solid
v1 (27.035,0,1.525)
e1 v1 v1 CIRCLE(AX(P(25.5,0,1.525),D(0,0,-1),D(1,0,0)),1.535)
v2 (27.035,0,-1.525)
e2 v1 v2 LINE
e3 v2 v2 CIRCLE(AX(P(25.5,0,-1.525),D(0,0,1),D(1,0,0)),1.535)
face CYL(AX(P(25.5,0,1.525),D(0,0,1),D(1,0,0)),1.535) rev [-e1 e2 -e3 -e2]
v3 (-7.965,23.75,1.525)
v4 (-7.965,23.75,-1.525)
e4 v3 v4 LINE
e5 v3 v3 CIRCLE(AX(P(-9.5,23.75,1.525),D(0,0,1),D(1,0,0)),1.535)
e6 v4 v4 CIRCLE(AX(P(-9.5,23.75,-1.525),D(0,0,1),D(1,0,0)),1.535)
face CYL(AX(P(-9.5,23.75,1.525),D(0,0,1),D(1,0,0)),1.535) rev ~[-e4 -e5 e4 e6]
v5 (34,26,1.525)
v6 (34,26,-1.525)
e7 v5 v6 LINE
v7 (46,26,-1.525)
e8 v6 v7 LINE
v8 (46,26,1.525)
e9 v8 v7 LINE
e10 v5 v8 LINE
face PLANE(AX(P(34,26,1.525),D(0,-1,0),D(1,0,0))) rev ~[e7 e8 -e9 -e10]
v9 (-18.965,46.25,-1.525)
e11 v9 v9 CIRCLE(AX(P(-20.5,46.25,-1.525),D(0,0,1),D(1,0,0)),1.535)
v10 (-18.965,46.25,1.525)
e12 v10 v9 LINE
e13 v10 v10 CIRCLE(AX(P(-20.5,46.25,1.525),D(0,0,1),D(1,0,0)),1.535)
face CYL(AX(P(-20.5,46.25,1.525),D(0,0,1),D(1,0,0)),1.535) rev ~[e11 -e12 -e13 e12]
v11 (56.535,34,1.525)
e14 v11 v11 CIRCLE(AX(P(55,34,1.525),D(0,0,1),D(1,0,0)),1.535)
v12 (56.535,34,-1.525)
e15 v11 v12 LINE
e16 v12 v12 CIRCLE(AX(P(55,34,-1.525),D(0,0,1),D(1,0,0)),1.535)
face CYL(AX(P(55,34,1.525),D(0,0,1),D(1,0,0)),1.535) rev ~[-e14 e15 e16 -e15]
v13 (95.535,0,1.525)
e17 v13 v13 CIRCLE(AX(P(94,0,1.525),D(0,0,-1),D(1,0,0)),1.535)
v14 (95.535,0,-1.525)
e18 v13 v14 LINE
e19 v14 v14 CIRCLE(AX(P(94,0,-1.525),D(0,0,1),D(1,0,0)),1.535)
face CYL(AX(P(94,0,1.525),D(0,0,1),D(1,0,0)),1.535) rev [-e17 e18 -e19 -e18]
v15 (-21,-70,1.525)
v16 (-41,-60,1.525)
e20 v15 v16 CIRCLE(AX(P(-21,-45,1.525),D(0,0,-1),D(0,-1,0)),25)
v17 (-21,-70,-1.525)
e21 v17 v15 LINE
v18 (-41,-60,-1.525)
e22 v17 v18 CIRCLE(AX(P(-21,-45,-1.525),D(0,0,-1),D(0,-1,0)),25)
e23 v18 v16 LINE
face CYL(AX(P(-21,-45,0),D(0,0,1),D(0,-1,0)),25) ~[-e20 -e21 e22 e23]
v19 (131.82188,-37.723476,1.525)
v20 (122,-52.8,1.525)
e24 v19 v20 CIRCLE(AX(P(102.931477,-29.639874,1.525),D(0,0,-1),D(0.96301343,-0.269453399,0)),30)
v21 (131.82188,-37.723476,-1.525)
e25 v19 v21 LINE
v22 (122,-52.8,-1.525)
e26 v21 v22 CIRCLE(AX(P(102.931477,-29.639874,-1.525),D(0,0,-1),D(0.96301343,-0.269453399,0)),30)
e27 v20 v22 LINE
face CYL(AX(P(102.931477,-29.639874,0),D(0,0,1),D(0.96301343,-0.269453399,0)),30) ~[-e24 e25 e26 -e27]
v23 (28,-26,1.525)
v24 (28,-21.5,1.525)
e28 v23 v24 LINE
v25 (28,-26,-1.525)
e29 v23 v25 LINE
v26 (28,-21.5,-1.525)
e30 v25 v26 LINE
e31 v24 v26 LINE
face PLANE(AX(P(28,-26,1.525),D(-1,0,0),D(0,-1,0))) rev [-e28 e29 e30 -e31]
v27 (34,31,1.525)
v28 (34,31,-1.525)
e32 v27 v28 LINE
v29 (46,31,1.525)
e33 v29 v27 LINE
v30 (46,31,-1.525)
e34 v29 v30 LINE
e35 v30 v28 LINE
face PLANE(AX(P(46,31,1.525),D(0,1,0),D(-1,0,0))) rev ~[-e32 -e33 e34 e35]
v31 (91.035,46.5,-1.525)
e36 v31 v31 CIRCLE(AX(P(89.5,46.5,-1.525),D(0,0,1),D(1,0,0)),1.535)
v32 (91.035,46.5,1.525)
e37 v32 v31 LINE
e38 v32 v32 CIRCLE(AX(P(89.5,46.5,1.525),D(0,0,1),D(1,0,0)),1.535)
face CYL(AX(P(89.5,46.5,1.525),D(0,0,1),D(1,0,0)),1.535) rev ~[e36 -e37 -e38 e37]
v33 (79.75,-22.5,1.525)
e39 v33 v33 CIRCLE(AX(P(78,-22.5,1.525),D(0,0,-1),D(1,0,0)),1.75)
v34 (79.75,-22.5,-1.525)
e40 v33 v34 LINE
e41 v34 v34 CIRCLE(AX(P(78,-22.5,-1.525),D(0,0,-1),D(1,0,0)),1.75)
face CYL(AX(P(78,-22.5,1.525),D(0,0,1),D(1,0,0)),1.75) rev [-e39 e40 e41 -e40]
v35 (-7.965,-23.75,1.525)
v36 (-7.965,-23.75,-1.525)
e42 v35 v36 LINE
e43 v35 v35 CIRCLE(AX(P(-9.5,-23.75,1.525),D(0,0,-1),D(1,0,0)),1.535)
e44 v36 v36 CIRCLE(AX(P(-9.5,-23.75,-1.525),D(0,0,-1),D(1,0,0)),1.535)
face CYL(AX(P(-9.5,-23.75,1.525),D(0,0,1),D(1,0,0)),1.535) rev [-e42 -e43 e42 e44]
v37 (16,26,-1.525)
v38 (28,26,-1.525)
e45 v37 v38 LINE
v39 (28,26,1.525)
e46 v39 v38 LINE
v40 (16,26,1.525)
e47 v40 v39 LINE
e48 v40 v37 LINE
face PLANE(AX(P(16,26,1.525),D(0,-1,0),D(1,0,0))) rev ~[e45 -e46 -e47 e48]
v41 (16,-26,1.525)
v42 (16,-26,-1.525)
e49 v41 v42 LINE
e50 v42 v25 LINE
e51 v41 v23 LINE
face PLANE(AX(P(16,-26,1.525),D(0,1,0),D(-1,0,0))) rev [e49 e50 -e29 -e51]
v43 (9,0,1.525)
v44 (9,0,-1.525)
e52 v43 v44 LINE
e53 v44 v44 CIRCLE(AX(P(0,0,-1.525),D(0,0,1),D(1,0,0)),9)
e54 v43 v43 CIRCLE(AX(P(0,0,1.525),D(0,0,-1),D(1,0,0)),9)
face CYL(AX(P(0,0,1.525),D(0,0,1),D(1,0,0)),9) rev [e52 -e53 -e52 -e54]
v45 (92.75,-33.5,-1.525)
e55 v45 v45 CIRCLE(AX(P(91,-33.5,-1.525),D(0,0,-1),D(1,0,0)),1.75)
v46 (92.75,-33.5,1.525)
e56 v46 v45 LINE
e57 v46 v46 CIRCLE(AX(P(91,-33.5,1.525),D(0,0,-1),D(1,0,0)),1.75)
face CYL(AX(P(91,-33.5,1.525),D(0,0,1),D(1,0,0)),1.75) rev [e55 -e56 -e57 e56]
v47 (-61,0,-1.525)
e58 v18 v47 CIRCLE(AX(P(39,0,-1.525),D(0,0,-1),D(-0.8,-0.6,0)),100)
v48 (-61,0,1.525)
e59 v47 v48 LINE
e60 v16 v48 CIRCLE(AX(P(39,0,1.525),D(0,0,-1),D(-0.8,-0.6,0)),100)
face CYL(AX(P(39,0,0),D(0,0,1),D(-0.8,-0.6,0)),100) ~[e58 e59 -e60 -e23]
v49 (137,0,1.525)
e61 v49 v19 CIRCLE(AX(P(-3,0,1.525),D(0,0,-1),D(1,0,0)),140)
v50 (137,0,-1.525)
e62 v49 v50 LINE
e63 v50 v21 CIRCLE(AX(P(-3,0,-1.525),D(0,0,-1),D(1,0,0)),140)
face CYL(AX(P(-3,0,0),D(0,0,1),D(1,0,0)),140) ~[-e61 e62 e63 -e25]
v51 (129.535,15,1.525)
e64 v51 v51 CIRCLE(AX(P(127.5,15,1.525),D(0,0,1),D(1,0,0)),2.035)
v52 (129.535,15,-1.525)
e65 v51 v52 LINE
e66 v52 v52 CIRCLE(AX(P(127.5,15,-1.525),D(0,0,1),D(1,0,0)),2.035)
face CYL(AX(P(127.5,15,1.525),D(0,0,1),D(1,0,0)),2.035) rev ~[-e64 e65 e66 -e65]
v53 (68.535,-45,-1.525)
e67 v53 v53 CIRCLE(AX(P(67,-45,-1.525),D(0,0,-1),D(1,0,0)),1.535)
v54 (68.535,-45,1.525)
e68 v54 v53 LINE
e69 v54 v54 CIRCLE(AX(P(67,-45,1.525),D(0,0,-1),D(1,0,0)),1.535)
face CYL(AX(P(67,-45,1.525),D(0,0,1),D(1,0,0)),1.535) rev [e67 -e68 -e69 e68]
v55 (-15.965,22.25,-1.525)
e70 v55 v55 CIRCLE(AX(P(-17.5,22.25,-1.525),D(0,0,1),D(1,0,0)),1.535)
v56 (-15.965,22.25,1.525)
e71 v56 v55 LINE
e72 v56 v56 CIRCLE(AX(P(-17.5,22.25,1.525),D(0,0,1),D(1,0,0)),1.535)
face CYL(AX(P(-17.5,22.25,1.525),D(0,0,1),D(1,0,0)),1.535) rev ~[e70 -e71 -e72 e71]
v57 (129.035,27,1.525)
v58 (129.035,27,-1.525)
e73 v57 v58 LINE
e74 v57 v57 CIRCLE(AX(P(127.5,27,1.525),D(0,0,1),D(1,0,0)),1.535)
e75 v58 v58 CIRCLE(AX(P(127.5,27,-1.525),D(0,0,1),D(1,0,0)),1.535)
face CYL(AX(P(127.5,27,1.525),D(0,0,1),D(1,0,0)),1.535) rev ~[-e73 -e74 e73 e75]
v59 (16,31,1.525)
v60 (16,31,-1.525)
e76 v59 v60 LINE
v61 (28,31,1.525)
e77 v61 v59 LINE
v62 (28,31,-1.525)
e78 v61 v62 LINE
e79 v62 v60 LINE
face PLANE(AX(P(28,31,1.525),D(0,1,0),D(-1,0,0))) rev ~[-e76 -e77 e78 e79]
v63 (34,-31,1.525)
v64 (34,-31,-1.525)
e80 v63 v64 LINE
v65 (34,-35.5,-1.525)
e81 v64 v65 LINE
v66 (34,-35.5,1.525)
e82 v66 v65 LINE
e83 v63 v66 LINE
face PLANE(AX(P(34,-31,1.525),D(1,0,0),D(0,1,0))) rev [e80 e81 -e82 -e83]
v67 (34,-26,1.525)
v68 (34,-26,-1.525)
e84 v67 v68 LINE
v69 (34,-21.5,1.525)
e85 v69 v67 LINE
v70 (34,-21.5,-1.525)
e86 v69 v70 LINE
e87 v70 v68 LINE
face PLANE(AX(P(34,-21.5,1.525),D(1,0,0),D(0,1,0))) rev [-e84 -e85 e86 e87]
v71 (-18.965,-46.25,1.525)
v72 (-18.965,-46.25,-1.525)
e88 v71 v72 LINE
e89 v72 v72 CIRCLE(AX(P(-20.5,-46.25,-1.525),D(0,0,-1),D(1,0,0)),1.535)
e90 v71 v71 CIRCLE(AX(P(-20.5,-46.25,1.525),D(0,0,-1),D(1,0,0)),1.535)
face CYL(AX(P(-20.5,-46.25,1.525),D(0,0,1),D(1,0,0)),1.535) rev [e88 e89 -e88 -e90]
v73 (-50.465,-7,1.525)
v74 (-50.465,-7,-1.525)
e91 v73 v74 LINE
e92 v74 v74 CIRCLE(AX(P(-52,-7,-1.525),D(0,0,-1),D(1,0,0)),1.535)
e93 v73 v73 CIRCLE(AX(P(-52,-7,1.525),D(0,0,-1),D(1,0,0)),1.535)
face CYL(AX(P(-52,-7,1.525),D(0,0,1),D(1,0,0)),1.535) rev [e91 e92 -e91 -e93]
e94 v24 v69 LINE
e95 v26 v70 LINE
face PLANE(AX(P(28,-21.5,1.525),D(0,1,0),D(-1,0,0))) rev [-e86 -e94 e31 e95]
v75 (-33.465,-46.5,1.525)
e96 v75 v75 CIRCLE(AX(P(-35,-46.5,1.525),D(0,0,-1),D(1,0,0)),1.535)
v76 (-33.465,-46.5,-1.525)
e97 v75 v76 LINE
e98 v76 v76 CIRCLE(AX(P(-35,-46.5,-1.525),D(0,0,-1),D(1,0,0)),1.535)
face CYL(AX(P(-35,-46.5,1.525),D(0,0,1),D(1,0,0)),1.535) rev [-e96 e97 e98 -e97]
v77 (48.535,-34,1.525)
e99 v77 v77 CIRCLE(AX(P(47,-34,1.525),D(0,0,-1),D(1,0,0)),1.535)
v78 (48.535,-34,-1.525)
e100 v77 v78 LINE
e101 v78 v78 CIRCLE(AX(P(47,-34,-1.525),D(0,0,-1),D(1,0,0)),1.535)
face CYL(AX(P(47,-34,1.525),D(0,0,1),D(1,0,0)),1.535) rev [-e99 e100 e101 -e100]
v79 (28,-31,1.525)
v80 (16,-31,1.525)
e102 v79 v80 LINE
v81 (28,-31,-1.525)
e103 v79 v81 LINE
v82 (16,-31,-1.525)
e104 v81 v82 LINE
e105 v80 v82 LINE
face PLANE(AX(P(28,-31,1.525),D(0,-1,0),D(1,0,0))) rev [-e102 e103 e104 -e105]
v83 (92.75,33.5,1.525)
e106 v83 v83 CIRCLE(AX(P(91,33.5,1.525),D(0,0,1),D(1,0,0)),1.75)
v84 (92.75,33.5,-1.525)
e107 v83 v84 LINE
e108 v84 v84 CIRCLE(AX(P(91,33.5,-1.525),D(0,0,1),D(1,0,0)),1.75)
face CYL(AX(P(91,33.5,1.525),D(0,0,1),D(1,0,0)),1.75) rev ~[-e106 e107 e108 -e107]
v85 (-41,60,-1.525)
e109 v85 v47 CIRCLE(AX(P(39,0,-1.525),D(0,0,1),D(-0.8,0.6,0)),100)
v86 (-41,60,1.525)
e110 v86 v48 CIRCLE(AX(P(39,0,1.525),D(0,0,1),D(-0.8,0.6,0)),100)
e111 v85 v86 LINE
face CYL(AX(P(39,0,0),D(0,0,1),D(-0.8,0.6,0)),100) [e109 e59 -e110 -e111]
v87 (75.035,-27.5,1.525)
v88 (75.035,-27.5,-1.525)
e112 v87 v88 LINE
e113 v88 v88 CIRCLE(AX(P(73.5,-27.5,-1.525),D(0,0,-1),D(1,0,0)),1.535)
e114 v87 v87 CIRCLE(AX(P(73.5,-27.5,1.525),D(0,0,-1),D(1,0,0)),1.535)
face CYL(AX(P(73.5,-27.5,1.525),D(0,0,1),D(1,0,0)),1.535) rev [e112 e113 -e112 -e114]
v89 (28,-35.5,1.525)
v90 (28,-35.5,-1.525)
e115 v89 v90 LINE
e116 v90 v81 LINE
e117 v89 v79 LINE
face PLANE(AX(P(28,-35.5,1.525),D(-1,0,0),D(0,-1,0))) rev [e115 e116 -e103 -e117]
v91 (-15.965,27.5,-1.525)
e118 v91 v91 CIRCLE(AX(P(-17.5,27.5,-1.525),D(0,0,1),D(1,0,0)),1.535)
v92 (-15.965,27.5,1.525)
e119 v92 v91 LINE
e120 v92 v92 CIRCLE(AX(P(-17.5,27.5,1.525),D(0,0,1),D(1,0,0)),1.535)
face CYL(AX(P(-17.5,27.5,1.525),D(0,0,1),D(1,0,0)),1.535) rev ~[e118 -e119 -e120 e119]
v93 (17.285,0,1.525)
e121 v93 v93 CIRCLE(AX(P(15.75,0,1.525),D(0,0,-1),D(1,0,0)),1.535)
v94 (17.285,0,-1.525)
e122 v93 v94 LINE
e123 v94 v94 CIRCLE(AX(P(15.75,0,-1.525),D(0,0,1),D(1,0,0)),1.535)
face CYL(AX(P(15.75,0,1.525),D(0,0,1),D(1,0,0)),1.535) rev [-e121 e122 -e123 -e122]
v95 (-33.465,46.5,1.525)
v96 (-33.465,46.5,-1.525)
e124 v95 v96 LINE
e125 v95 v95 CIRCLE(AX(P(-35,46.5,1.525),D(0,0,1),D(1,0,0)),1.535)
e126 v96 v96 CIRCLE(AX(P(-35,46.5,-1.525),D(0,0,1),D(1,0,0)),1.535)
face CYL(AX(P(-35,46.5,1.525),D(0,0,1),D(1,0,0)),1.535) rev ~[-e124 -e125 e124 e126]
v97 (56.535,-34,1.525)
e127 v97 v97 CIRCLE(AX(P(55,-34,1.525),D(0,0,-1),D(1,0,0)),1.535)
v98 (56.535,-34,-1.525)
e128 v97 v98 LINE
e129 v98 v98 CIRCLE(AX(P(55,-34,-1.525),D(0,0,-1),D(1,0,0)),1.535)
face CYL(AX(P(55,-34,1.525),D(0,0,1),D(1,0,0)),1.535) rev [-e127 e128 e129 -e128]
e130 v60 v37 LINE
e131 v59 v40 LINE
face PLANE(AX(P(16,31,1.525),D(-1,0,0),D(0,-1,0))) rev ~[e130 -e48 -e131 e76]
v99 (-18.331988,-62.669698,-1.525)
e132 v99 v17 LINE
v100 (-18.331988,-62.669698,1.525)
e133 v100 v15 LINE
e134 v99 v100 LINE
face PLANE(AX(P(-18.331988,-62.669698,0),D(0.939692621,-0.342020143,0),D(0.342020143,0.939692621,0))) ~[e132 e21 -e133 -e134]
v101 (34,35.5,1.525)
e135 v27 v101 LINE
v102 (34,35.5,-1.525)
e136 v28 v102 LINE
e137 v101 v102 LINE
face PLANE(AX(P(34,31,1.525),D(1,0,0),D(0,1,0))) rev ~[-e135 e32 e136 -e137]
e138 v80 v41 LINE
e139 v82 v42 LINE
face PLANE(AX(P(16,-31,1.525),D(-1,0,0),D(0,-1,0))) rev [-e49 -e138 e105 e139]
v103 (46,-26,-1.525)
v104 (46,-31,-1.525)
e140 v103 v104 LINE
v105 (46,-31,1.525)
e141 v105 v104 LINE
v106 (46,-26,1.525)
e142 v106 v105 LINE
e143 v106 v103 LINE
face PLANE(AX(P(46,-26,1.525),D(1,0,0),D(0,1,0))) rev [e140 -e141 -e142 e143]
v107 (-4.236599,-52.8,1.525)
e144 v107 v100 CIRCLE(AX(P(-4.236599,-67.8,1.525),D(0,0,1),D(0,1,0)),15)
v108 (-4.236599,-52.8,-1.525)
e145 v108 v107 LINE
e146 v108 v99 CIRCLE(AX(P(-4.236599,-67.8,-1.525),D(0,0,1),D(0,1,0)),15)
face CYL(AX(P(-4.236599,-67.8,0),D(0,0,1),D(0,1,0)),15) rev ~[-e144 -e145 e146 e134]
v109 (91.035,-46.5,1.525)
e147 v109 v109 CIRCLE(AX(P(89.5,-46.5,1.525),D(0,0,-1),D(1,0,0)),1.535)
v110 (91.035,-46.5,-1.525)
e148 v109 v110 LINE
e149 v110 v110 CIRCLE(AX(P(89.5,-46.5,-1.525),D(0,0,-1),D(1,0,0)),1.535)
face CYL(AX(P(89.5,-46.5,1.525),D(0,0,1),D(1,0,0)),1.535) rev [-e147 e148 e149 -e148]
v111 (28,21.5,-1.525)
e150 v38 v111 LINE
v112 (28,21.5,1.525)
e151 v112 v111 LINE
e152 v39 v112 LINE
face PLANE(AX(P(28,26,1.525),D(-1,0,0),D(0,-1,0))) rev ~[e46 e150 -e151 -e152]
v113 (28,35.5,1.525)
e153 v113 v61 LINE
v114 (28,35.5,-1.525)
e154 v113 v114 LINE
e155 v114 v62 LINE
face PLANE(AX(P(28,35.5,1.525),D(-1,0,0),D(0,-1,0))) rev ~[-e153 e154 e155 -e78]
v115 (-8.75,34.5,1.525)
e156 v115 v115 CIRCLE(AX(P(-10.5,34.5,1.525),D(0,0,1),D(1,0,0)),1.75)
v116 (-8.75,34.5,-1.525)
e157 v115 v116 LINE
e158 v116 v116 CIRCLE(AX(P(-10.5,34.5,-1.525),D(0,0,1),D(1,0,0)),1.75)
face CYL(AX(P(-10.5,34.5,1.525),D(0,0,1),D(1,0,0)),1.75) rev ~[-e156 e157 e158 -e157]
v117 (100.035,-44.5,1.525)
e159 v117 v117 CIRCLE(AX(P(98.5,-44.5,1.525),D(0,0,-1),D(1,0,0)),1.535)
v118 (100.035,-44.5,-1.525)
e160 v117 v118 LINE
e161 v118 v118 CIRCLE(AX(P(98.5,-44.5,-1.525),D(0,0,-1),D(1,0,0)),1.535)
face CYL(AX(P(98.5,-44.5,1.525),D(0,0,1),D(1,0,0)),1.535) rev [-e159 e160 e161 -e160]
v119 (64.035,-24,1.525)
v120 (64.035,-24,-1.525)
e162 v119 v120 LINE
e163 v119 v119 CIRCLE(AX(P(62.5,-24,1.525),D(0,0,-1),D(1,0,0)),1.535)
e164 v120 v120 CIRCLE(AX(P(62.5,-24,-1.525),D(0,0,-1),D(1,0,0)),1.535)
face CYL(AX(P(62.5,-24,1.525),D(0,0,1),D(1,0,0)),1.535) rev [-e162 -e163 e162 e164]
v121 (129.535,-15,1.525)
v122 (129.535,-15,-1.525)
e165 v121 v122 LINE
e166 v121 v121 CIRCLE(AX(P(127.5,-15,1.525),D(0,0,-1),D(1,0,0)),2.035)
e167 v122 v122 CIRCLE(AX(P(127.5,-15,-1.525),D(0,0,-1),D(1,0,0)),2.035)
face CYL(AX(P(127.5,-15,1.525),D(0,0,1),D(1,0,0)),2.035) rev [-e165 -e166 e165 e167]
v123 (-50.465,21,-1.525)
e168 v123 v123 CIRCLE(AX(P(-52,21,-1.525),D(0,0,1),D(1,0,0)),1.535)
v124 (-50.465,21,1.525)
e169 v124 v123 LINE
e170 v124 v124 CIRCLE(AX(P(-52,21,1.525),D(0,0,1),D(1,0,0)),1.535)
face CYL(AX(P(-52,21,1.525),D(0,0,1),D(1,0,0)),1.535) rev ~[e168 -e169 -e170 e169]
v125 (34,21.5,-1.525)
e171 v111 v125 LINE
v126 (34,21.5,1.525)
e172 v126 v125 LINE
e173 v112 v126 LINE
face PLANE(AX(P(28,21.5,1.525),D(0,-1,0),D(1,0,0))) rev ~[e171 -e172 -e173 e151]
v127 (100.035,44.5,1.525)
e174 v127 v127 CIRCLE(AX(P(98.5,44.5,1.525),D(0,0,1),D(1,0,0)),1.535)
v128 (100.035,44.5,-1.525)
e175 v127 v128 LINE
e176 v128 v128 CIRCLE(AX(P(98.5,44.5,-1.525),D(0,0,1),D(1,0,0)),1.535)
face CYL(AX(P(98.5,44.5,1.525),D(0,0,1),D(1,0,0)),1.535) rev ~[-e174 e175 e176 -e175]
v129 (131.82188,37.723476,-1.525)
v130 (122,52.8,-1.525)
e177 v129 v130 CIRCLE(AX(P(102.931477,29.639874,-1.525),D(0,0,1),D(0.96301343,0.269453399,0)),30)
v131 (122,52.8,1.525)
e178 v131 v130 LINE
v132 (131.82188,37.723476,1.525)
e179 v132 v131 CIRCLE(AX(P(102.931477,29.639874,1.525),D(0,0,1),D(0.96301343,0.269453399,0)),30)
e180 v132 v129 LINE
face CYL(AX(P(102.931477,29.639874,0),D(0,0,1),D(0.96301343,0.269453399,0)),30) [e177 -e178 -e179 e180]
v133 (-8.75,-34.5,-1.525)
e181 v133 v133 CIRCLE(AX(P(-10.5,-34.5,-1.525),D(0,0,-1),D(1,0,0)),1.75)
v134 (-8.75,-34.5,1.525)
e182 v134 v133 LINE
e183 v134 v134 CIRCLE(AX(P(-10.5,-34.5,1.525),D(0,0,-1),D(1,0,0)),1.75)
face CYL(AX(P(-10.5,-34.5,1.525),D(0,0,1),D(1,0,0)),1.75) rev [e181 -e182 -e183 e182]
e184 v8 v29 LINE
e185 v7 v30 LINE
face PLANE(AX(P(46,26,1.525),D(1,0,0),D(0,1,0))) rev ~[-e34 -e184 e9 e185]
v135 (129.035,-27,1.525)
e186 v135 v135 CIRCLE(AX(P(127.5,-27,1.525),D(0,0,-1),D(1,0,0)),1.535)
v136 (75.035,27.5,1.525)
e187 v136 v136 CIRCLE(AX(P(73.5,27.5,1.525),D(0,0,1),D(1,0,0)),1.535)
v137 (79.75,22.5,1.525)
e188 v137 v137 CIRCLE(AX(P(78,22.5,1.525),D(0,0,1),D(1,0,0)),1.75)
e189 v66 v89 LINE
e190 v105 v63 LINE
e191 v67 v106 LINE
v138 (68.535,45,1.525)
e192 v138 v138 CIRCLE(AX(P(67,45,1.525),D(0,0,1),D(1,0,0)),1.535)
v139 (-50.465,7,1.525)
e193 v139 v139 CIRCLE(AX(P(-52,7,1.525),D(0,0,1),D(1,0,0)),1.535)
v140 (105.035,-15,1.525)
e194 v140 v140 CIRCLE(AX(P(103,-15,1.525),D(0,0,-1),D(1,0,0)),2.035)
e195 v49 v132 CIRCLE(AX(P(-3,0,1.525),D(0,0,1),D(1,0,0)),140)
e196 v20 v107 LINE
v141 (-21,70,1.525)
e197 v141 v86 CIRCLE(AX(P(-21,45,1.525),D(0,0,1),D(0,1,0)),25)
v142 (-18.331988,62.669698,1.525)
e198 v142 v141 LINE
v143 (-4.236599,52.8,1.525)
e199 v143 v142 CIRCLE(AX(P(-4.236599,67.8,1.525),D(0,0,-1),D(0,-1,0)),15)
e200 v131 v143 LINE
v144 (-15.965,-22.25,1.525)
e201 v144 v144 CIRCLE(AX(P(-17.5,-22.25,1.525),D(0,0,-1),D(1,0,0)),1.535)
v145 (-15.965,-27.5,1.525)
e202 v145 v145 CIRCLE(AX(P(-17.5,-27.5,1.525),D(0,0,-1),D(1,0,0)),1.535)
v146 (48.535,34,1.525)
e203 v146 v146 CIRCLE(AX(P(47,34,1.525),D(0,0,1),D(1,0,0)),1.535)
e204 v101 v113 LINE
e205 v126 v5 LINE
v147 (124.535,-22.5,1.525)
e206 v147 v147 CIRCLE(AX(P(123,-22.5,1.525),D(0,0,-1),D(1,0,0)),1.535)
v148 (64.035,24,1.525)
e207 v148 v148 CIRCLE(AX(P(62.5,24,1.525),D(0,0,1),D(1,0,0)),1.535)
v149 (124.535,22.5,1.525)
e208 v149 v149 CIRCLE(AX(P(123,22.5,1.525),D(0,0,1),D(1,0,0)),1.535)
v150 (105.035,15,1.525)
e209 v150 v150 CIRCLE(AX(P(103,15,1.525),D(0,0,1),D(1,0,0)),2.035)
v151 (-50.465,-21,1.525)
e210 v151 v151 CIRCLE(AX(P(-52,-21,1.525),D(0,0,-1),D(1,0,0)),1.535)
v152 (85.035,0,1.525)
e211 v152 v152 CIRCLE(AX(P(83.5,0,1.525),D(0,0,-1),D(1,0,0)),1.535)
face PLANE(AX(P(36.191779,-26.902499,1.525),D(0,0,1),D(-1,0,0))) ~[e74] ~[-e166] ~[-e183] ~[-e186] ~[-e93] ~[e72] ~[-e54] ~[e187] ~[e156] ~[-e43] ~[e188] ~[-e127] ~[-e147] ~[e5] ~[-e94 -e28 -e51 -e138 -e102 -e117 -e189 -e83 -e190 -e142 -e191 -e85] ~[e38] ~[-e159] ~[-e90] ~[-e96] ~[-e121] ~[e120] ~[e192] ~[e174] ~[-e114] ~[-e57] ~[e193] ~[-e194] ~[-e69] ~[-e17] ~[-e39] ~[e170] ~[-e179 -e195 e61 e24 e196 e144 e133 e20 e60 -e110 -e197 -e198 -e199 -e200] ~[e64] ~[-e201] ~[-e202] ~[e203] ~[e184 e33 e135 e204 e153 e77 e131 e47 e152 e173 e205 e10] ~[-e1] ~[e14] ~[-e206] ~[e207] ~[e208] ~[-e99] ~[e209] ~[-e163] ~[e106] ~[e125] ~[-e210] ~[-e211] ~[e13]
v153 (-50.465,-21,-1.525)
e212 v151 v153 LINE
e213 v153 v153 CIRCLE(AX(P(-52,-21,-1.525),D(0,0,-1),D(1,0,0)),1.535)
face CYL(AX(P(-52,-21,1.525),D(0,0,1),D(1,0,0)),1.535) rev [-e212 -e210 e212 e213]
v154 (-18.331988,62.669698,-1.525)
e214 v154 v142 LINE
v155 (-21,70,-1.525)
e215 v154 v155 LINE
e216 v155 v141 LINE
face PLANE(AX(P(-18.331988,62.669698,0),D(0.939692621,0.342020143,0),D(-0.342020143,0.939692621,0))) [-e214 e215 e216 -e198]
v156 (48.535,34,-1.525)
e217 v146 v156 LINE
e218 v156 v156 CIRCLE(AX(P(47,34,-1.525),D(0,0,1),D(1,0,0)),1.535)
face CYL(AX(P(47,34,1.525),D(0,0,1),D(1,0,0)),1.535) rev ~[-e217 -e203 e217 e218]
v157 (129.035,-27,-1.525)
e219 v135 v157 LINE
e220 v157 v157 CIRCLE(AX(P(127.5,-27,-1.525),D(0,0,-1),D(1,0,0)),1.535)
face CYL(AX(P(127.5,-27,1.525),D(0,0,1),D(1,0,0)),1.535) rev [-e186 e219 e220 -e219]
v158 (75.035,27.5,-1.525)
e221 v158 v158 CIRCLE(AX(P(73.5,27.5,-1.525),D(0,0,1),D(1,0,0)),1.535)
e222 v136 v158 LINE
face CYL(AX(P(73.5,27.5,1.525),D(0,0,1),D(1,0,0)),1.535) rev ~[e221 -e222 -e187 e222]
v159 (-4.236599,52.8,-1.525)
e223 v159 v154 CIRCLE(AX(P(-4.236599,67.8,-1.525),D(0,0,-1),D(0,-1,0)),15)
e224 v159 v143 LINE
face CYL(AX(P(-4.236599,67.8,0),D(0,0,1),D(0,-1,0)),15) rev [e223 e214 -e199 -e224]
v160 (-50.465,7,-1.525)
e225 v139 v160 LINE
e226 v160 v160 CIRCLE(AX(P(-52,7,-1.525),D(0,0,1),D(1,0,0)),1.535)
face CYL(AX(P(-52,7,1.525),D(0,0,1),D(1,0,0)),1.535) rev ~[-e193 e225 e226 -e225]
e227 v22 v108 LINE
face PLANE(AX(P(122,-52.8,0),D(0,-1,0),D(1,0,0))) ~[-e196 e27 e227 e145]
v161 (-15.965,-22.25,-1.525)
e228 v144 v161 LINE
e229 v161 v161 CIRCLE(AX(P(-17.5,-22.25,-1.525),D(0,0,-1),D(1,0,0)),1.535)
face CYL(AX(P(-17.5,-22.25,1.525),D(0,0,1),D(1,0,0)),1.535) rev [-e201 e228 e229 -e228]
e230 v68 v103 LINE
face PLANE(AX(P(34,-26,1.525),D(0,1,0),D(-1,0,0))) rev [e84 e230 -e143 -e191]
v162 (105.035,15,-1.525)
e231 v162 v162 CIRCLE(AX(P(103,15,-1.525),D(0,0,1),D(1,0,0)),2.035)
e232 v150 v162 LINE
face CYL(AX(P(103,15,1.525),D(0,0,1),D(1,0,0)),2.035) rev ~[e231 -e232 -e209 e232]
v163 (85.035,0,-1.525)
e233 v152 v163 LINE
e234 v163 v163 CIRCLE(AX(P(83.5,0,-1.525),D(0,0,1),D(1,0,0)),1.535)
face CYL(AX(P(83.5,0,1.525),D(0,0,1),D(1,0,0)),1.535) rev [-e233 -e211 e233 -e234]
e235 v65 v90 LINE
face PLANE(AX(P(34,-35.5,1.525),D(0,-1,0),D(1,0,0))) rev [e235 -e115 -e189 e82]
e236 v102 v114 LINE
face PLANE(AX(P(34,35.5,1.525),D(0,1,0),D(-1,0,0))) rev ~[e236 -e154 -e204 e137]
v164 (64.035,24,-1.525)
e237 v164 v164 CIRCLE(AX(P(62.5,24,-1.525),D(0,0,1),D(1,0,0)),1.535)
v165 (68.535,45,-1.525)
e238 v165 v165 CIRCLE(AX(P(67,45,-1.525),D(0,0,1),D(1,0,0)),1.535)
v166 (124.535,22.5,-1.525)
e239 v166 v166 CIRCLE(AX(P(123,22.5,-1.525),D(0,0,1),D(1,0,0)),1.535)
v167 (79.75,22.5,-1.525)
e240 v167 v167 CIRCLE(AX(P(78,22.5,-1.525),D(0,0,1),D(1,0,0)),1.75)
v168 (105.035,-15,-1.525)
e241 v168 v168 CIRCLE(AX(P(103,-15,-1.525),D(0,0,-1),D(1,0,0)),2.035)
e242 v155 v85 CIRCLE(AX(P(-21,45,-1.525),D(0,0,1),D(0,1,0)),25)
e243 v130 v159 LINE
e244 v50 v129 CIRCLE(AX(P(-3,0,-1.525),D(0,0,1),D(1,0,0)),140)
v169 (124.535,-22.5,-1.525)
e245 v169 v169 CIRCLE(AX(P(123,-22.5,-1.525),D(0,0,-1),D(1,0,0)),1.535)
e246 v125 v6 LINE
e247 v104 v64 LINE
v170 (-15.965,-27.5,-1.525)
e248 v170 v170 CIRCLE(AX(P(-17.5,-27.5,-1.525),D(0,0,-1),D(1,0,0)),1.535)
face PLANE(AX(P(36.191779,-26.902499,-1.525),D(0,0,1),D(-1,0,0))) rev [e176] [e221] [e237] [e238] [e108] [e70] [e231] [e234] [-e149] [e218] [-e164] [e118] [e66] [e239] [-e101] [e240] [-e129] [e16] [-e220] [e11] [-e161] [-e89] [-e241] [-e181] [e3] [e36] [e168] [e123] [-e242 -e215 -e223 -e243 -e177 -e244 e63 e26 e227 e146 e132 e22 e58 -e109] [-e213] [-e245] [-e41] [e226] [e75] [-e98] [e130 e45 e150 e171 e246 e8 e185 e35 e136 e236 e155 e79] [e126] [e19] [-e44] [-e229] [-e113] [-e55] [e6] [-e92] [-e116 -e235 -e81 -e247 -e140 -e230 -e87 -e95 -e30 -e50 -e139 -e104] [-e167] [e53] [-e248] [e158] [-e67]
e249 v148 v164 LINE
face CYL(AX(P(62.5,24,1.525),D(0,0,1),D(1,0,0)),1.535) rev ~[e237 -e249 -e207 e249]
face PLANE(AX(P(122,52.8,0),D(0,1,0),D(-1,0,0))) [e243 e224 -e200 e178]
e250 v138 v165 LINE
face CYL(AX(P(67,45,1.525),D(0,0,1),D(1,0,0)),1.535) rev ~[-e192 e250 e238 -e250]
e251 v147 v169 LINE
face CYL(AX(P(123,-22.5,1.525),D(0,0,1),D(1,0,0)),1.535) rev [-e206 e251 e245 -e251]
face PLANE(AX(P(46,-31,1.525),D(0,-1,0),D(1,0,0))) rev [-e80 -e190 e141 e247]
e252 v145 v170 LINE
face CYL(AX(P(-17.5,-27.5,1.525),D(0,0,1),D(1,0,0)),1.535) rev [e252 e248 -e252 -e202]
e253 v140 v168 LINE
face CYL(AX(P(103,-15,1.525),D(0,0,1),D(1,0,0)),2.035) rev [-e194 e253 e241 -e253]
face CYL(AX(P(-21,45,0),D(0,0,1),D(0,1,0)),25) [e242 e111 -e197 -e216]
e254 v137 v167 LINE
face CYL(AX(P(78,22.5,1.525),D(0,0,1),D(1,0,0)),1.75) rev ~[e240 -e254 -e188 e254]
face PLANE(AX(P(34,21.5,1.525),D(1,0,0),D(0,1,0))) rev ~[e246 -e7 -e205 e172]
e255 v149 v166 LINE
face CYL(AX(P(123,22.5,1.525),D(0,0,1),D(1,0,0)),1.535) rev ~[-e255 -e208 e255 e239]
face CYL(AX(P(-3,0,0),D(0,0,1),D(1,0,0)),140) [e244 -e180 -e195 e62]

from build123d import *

# Parameters (mm, degrees)
F1_DEPTH = 1.525
F2_R     = 9
F2_R_2   = 1.535
F2_R_3   = 1.75
F2_R_4   = 2.035
F3_DEPTH = 3.051
F6_DEPTH = 3.05


# Not quite as in the source:
# - a pattern or mirror of a feature is missing from the dataset's text; its kind, count and spacing are read off the source's solid


with BuildPart() as f1:
    # F0 (on Top) → F1 (new body, symmetric)
    with BuildSketch(Plane.XY):
        with BuildLine():
            Line((122, 52.8), (-4.2365988975, 52.8))
            ThreePointArc((-4.2365988975, 52.8), (-12.8402454427, 55.5127193357), (-18.3319882093, 62.6696978501))
            Line((-18.3319882093, 62.6696978501), (-21, 70))
            ThreePointArc((-21, 70), (-32.1803398875, 67.360679775), (-41, 60))
            ThreePointArc((-41, 60), (-55.8683298051, 31.6227766017), (-61, 0))
            Line((-61, 0), (137, 0))
            ThreePointArc((137, 0), (135.6994290201, 19.038602614), (131.8218801501, 37.7234758844))
            ThreePointArc((131.8218801501, 37.7234758844), (128.067905641, 46.0154645332), (122, 52.8))
        make_face()
    extrude(amount=F1_DEPTH, both=True)

    # F2 (on face) → F3 (cut, through all)
    with BuildSketch(Plane.XY.offset(1.525)):
        Circle(F2_R)
        with Locations((-52, 21)):
            Circle(F2_R_2)
        with Locations((-52, 7)):
            Circle(F2_R_2)
        with Locations((-35, 46.5)):
            Circle(F2_R_2)
        with Locations((-20.5, 46.25)):
            Circle(F2_R_2)
        with Locations((-17.5, 27.5)):
            Circle(F2_R_2)
        with Locations((-17.5, 22.25)):
            Circle(F2_R_2)
        with Locations((-10.5, 34.5)):
            Circle(F2_R_3)
        with Locations((-9.5, 23.75)):
            Circle(F2_R_2)
        with Locations((15.75, 0)):
            Circle(F2_R_2)
        with Locations((25.5, 0)):
            Circle(F2_R_2)
        with Locations((47, 34)):
            Circle(F2_R_2)
        with Locations((55, 34)):
            Circle(F2_R_2)
        with Locations((62.5, 24)):
            Circle(F2_R_2)
        with Locations((67, 45)):
            Circle(F2_R_2)
        with Locations((73.5, 27.5)):
            Circle(F2_R_2)
        with Locations((78, 22.5)):
            Circle(F2_R_3)
        with Locations((83.5, 0)):
            Circle(F2_R_2)
        with Locations((94, 0)):
            Circle(F2_R_2)
        with Locations((91, 33.5)):
            Circle(F2_R_3)
        with Locations((89.5, 46.5)):
            Circle(F2_R_2)
        with Locations((98.5, 44.5)):
            Circle(F2_R_2)
        with Locations((103, 15)):
            Circle(F2_R_4)
        with Locations((123, 22.5)):
            Circle(F2_R_2)
        with Locations((127.5, 27)):
            Circle(F2_R_2)
        with Locations((127.5, 15)):
            Circle(F2_R_4)
    extrude(amount=-F3_DEPTH, mode=Mode.SUBTRACT)

    # F4: F1 across face


with BuildPart() as f1_1:
    add(f1.part)
    add(f1.part.mirror(Plane(origin=(54.5, 0, 0), x_dir=(1, 0, 0), z_dir=(0, -1, 0))))

    # F5 (on face) → F6 (cut, through all)
    with BuildSketch(Plane.XY.offset(1.525)):
        Polygon((46, 31), (34, 31), (34, 35.5), (28, 35.5), (28, 31), (16, 31), (16, 26), (28, 26), (28, 21.5), (34, 21.5), (34, 26), (46, 26), align=None)
    f6 = extrude(amount=-F6_DEPTH, mode=Mode.SUBTRACT)

    # F6_copies: F6 across plane
    add(f6.mirror(Plane(origin=(0, 0, 0), x_dir=(0, 0, -1), z_dir=(0, -1, 0))), mode=Mode.SUBTRACT)


solid = f1_1.part
